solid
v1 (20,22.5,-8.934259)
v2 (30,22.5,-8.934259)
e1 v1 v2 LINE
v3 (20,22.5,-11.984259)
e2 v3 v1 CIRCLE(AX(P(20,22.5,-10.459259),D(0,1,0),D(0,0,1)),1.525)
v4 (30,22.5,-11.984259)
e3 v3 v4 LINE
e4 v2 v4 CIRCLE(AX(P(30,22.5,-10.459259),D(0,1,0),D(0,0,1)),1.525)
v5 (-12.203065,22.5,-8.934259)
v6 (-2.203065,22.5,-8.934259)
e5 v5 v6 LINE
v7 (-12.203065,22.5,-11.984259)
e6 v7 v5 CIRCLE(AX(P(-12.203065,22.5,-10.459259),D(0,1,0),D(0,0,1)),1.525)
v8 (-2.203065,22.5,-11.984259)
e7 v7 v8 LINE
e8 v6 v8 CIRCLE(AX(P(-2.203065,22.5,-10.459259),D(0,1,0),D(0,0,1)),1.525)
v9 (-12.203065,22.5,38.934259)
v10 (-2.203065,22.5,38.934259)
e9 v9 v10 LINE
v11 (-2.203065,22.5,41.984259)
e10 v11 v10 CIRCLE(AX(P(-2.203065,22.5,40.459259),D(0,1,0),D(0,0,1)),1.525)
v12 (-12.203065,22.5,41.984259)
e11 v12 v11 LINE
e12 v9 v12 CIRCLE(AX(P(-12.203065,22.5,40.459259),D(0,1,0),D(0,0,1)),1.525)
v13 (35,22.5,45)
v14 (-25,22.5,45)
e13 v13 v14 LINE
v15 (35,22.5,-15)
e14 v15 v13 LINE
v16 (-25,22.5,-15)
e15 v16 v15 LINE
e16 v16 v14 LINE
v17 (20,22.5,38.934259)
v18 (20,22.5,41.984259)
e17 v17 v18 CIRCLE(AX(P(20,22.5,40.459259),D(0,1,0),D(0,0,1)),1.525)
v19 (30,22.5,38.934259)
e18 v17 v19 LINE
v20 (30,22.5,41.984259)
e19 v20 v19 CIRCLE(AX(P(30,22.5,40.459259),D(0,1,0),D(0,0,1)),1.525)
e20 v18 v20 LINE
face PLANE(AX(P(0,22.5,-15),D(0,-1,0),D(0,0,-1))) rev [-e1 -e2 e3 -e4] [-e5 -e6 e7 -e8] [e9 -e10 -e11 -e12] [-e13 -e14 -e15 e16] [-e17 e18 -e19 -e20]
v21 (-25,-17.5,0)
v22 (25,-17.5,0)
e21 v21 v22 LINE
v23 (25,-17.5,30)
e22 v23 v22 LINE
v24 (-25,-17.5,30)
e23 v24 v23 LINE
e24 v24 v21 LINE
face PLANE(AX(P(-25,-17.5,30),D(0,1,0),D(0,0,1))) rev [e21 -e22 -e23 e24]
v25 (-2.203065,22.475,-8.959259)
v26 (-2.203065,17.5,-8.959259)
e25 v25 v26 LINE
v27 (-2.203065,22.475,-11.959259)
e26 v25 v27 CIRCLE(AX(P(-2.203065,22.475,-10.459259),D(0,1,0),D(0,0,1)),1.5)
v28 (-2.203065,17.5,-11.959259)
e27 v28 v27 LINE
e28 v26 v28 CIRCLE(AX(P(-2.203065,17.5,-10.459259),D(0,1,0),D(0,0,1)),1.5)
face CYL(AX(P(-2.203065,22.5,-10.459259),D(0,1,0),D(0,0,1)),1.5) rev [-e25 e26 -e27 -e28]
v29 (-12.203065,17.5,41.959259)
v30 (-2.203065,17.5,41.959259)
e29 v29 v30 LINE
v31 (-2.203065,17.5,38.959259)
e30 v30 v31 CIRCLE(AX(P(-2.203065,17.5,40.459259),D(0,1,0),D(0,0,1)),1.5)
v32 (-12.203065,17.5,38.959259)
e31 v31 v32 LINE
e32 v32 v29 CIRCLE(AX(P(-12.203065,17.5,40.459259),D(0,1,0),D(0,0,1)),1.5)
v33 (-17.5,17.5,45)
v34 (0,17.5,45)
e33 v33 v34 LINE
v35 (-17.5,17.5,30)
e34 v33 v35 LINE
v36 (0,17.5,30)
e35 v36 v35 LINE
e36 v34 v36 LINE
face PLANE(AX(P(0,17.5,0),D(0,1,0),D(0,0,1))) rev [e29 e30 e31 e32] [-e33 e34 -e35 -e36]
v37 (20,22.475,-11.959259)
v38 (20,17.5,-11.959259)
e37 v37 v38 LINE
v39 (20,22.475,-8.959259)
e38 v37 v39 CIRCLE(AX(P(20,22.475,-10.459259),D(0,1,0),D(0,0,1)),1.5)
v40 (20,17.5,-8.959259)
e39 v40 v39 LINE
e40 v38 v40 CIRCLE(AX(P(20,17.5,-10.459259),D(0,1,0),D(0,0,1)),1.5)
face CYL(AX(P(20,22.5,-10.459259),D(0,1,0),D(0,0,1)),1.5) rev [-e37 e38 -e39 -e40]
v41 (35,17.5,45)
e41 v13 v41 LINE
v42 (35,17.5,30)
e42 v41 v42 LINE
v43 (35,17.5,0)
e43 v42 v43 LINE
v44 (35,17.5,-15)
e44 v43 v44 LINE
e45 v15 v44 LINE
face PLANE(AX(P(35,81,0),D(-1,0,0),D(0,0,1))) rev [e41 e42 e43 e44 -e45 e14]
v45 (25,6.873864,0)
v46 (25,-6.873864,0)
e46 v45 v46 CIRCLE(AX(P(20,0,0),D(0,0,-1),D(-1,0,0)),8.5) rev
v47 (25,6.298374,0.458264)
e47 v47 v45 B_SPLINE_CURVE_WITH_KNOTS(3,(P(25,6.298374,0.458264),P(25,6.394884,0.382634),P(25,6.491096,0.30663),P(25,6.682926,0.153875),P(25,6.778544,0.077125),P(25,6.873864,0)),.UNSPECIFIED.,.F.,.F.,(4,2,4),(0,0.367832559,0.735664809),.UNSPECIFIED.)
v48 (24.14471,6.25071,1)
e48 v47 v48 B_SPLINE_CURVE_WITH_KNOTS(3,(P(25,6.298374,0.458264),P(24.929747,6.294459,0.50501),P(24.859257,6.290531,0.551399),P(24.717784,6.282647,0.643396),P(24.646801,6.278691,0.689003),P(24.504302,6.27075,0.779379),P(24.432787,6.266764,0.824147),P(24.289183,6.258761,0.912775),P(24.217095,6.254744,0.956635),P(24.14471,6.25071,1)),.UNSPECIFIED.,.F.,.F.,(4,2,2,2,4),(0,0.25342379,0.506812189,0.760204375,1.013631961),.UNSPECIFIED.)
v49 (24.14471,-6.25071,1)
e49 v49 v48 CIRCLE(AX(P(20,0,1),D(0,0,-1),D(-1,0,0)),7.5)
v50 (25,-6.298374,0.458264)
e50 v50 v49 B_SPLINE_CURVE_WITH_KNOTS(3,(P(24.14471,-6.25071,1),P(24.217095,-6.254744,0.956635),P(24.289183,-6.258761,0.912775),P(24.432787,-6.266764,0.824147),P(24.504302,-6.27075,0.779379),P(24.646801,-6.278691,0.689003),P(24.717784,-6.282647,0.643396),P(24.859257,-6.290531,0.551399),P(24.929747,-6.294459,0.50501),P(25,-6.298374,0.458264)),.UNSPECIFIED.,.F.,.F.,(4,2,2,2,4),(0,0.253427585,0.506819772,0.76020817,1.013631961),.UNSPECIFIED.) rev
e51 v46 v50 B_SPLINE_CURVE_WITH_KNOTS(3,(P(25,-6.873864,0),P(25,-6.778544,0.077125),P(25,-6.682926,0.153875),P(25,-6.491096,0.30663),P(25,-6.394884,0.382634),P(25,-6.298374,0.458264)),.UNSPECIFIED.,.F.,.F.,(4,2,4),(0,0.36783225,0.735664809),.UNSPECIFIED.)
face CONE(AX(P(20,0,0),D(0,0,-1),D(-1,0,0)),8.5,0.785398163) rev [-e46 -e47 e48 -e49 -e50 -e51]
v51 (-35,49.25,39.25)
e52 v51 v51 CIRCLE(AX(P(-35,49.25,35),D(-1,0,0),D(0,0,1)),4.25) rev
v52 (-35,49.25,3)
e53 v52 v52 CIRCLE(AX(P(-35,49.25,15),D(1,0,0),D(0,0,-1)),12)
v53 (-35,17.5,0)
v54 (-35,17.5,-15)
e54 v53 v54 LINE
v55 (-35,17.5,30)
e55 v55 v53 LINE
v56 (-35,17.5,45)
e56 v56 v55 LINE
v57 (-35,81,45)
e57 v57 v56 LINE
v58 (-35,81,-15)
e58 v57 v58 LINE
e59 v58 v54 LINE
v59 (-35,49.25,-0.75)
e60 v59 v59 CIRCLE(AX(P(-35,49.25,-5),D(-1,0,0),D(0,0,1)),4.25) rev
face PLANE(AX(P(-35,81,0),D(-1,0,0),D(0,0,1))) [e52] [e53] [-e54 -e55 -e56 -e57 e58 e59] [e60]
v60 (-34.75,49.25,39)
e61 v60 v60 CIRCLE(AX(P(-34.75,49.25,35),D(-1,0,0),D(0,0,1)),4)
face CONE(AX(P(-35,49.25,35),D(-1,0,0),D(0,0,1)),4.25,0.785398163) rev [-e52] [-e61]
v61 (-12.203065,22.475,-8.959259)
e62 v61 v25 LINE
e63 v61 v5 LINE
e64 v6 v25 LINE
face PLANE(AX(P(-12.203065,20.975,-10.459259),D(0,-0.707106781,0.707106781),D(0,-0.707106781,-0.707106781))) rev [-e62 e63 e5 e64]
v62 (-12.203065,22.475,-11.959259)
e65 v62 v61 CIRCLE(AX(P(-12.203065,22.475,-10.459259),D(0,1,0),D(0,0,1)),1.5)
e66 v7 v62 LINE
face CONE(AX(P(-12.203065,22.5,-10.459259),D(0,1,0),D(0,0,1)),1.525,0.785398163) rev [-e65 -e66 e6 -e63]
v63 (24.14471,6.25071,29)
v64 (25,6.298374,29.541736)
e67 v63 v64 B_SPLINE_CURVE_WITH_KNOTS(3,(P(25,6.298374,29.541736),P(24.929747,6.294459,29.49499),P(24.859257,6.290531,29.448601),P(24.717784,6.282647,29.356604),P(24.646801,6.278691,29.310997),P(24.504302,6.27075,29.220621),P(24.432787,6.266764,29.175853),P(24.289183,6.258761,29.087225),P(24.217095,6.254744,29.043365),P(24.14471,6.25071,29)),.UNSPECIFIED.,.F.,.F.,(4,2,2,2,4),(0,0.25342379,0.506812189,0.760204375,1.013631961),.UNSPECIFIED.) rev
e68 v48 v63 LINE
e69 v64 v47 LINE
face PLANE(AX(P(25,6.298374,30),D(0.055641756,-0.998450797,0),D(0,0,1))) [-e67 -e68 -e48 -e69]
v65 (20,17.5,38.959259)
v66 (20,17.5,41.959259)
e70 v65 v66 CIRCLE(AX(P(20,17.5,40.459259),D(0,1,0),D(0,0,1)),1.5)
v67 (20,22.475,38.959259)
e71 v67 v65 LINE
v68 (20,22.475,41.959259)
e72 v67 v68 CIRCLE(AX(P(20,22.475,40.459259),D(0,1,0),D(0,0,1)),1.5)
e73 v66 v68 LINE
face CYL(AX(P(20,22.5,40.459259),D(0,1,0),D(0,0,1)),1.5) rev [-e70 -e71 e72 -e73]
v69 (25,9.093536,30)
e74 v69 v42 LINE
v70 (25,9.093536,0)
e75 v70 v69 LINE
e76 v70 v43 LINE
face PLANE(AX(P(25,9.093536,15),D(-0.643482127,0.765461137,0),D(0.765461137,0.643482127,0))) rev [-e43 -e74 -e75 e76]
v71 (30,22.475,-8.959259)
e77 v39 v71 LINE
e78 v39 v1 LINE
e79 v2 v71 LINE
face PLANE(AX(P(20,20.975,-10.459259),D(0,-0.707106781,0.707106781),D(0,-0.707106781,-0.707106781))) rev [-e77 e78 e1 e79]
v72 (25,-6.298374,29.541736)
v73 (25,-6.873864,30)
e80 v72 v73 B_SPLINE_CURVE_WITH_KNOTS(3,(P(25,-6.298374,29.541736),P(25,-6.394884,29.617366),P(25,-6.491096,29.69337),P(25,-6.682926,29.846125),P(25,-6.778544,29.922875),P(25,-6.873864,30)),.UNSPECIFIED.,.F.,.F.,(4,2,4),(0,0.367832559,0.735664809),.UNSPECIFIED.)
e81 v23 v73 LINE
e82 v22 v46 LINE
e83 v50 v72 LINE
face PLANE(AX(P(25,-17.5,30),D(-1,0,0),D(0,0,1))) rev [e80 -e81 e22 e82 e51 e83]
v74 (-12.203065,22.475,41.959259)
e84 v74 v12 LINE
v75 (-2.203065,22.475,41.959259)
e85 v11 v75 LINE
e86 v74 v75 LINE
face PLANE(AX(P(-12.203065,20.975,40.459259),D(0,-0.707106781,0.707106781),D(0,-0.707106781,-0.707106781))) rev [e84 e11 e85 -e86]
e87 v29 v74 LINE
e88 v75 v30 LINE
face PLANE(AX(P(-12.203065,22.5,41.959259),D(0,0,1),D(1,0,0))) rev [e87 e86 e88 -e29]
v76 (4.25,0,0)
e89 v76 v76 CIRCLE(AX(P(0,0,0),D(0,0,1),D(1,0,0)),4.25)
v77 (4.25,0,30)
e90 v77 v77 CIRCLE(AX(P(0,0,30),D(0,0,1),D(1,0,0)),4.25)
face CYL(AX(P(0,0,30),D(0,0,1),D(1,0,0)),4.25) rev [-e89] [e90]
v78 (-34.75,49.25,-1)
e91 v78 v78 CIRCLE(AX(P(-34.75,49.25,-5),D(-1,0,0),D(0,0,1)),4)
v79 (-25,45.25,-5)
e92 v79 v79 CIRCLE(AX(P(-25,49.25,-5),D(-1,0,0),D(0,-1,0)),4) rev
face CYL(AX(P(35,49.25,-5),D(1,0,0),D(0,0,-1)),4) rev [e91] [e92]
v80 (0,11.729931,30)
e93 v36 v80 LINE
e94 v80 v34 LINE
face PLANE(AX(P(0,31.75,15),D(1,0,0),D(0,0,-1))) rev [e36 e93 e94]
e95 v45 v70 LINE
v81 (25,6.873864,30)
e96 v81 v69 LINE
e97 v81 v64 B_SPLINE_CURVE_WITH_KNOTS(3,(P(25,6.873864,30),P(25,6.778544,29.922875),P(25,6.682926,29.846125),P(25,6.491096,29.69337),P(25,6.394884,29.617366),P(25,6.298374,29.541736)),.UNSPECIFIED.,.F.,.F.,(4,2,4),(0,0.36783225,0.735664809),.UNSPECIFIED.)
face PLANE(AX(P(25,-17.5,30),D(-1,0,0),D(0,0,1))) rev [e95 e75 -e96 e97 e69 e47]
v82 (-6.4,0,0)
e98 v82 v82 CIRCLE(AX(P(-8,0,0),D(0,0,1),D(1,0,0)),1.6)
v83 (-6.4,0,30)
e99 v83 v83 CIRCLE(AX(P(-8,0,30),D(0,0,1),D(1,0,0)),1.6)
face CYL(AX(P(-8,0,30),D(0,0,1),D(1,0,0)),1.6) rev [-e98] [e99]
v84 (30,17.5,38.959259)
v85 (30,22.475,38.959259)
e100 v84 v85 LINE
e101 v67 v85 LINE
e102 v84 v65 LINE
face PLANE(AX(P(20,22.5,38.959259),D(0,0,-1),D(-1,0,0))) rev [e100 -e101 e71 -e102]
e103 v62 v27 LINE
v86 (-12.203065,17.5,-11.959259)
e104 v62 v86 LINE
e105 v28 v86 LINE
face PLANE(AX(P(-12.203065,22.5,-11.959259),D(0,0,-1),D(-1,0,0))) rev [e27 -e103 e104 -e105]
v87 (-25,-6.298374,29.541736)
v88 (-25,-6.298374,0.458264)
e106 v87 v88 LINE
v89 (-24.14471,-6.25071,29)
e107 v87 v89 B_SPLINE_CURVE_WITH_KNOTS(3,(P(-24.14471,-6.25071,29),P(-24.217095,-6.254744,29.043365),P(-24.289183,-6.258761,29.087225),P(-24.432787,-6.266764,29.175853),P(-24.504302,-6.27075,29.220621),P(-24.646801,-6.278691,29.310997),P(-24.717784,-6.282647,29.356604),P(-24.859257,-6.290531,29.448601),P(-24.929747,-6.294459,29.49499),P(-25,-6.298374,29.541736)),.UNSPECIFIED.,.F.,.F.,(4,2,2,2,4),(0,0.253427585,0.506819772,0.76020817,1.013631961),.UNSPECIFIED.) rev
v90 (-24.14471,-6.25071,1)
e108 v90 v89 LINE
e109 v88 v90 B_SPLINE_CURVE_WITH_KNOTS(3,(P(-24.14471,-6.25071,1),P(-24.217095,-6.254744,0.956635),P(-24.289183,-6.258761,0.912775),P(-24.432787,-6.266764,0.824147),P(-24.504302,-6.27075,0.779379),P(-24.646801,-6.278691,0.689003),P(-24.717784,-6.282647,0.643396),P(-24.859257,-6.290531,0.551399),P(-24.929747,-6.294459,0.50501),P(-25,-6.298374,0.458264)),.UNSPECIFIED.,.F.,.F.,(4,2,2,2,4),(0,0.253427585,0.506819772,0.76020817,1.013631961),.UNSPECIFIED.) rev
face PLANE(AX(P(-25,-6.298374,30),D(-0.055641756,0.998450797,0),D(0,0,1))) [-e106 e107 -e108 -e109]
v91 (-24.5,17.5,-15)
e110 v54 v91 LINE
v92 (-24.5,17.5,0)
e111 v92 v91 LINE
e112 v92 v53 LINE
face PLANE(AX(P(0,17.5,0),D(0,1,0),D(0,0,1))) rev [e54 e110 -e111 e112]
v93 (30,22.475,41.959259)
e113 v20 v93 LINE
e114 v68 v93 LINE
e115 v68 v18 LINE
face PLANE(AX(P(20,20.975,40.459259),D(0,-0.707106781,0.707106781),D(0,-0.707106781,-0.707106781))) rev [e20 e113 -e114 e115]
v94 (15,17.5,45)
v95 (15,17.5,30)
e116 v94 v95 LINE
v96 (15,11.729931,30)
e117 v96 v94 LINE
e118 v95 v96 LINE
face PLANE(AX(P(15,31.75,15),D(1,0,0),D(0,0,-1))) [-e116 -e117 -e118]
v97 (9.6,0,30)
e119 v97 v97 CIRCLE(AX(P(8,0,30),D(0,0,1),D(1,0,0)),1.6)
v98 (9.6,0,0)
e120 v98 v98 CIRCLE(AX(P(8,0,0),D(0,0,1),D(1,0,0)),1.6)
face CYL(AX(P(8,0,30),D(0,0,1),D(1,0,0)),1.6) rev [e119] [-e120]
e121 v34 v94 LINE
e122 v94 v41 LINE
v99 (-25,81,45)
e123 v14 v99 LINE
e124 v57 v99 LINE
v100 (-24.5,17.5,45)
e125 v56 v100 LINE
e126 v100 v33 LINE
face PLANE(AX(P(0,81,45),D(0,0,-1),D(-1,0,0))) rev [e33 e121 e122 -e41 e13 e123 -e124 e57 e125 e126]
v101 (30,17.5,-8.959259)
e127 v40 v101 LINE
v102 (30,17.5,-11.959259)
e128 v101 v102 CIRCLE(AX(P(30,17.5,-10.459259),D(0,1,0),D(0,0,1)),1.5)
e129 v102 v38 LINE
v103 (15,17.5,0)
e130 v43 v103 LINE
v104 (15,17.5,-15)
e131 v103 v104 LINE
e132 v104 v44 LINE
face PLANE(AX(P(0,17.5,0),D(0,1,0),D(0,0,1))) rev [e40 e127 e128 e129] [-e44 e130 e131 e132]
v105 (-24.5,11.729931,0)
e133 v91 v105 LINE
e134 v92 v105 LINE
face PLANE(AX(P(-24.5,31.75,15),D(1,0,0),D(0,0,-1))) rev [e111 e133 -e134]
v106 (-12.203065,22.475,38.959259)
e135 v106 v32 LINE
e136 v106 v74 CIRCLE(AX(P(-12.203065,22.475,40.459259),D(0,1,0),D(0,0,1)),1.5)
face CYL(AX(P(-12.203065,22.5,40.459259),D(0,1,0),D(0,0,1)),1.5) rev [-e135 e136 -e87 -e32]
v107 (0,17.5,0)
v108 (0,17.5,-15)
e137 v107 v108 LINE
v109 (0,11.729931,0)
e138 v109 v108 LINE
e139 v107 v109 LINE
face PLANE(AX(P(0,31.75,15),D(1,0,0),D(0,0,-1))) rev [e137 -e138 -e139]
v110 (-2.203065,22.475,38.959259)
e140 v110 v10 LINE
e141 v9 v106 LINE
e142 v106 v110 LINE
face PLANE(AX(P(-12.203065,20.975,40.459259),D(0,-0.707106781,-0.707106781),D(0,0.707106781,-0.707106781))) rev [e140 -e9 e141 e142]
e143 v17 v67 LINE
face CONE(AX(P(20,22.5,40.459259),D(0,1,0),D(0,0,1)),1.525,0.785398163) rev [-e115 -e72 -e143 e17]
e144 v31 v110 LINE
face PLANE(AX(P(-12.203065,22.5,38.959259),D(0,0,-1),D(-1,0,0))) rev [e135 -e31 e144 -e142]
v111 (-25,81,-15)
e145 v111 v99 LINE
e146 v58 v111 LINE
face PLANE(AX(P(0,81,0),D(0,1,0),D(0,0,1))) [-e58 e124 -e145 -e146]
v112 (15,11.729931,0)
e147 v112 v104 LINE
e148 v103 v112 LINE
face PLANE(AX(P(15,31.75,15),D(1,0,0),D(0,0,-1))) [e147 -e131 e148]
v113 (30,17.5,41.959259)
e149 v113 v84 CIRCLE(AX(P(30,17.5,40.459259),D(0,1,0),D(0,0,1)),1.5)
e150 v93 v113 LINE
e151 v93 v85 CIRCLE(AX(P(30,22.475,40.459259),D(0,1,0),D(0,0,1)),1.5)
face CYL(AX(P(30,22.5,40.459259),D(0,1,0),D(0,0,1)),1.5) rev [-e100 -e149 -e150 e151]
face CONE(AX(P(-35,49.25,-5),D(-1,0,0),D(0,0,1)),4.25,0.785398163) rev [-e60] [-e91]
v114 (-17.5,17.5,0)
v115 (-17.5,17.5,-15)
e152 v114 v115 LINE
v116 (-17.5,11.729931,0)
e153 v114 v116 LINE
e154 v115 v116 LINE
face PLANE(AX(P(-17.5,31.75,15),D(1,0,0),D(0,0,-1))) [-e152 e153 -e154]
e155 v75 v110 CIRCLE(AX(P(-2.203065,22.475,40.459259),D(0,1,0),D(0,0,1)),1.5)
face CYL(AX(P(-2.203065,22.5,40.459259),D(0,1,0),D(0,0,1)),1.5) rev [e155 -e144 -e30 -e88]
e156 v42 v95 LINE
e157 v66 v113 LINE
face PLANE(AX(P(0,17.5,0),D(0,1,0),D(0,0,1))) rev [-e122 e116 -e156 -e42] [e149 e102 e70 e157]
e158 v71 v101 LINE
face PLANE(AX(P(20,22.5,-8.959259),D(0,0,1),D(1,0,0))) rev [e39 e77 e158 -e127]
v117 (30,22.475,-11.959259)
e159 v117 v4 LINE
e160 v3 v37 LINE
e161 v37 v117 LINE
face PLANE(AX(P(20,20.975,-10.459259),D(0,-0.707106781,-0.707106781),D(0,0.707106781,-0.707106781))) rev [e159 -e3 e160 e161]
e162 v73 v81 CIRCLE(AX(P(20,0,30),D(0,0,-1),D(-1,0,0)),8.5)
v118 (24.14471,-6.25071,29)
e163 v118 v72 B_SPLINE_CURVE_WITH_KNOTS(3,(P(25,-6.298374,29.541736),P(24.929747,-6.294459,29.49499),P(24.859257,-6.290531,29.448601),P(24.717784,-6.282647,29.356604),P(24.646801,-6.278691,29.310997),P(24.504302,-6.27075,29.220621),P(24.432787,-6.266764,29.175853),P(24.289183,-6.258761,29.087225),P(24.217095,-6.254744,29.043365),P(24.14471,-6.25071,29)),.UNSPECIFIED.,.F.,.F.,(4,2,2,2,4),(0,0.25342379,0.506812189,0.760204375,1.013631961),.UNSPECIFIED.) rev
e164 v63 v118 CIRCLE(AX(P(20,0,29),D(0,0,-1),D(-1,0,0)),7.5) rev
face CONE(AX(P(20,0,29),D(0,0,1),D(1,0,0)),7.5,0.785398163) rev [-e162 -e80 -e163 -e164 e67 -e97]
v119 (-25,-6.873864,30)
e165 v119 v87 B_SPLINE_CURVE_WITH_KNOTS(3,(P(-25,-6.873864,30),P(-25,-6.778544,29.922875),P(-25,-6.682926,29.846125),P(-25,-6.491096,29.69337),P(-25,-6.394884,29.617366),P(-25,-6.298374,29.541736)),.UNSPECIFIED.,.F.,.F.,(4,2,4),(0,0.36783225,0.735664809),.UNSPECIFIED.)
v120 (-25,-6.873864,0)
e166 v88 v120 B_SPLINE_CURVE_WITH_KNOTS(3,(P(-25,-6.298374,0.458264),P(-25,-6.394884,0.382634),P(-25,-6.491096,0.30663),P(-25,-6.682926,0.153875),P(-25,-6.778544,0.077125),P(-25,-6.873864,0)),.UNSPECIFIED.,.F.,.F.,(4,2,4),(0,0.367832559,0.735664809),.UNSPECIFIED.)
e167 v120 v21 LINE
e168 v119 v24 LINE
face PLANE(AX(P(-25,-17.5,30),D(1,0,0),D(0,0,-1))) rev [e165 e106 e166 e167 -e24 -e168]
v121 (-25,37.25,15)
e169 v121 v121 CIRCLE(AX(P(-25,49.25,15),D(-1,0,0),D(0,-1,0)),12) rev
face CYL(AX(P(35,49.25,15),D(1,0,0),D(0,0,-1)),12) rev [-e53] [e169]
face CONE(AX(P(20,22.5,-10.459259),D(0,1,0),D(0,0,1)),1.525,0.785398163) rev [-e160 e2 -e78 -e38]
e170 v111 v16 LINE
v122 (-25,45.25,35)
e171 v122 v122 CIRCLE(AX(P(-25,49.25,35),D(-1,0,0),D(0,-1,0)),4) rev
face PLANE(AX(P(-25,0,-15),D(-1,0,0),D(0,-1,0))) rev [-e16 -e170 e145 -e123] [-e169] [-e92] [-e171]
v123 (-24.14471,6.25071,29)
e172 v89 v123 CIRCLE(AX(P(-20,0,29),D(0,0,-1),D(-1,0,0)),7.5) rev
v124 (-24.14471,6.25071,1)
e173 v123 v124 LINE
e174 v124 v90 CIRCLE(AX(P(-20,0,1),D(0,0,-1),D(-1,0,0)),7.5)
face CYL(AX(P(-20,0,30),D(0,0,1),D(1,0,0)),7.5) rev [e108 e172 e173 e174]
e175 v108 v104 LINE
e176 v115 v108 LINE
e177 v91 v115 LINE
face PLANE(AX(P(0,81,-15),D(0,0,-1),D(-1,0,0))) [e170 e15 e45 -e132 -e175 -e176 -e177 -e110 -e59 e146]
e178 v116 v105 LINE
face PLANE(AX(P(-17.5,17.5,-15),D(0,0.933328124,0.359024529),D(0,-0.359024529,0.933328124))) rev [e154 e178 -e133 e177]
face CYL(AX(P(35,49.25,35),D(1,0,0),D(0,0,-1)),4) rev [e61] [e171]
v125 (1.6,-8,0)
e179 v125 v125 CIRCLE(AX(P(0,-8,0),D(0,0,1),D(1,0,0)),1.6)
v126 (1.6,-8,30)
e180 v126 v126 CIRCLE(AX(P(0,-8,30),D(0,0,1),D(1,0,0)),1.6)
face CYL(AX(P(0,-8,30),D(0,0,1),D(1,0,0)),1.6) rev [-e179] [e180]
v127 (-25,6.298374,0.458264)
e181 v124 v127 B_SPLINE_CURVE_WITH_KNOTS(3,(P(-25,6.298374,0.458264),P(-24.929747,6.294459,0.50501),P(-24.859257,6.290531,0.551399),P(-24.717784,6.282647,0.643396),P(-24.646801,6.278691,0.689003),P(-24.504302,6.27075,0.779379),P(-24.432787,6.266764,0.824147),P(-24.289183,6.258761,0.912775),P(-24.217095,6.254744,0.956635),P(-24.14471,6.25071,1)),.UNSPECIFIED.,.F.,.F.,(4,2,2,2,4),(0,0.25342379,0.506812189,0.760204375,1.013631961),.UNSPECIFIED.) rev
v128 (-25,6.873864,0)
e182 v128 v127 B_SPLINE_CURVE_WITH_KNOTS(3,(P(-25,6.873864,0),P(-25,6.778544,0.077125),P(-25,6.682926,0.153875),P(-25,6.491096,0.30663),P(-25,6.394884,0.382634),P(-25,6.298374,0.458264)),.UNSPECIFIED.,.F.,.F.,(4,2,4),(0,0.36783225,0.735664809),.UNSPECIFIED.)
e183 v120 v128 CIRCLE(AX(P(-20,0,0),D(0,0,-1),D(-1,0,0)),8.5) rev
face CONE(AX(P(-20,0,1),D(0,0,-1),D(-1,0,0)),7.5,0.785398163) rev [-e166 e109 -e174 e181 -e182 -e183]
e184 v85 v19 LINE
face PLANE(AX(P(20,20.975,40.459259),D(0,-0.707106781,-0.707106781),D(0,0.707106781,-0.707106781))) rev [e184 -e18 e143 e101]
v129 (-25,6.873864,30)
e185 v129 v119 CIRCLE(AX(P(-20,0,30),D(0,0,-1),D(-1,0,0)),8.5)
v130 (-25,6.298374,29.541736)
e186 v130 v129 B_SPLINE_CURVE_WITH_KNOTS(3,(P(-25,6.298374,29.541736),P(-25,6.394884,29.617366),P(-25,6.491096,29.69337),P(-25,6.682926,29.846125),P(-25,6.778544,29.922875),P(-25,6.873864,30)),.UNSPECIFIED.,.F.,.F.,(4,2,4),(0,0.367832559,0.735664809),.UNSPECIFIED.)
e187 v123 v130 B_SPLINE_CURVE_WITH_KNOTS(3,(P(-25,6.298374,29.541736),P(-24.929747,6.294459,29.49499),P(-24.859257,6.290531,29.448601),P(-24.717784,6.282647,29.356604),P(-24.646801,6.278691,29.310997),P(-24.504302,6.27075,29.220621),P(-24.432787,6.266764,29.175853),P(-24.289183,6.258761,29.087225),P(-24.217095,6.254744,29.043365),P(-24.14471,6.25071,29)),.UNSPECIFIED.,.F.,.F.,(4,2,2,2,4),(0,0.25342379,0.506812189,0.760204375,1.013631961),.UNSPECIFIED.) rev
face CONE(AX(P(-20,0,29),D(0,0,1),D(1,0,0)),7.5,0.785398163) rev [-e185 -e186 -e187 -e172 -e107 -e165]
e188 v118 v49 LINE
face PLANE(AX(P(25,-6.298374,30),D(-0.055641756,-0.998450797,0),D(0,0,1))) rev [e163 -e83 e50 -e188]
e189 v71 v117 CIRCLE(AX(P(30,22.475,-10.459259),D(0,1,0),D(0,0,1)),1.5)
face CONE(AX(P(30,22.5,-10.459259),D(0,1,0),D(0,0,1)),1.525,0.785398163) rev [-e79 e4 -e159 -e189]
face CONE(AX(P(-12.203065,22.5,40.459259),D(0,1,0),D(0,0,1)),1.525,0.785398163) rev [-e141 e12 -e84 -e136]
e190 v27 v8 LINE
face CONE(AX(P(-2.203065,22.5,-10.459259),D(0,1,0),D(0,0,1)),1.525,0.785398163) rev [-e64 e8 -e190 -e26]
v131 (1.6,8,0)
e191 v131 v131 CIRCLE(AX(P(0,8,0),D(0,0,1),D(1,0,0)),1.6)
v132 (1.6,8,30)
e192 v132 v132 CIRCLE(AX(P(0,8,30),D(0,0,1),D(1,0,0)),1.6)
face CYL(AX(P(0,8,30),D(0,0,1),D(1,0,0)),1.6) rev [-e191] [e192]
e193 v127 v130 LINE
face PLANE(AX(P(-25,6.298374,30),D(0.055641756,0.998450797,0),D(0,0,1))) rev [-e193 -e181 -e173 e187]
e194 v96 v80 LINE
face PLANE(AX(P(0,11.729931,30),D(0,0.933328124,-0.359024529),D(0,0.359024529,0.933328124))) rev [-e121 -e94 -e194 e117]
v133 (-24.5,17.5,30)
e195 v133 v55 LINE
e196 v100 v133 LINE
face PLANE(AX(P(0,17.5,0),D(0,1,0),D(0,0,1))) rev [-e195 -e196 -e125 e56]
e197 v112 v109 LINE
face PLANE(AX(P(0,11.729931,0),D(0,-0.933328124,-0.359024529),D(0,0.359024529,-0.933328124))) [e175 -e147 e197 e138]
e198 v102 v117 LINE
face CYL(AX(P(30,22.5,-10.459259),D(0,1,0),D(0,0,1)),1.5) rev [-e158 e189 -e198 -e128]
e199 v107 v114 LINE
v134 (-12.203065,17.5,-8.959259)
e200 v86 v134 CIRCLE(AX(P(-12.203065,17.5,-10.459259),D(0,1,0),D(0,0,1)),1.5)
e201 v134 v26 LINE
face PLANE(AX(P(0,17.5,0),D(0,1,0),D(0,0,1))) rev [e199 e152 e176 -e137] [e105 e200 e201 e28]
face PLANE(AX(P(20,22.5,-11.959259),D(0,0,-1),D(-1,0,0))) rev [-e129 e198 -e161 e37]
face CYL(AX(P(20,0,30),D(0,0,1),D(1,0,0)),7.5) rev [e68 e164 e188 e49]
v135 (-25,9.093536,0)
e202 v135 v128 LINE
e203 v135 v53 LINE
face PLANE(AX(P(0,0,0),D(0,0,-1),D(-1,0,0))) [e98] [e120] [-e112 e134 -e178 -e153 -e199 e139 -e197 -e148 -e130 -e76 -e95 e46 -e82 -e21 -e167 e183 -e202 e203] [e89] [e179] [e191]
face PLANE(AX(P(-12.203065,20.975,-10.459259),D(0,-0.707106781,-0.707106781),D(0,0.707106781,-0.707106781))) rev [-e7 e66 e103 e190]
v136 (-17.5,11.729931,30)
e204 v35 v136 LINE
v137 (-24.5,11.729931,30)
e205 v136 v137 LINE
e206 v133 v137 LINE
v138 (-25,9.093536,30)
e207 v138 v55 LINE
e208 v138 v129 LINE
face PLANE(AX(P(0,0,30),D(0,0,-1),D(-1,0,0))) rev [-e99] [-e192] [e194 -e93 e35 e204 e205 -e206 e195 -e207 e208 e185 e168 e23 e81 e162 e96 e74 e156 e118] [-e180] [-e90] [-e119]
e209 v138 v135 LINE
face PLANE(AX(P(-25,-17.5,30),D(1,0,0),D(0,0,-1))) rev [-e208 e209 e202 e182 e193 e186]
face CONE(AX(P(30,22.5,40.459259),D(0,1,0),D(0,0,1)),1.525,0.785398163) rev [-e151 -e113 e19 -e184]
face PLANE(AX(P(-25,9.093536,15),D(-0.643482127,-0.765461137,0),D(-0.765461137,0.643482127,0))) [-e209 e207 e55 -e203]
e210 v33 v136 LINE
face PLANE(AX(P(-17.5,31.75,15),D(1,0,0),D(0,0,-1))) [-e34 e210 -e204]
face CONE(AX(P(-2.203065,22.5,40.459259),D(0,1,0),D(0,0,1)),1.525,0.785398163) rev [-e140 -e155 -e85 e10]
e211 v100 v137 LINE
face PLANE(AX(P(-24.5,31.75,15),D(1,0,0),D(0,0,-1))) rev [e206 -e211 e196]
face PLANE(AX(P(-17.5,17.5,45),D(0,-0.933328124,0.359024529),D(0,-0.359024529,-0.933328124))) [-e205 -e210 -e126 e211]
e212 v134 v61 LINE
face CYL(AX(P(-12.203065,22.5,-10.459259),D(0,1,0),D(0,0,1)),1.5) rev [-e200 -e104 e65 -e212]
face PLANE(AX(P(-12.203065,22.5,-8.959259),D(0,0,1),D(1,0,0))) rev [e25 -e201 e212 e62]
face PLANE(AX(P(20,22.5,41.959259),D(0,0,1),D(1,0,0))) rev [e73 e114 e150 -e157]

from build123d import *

# Parameters (mm, degrees)
SKETCH_1_W               = 50
SKETCH_1_H               = 35
EXTRUDE_1_DEPTH          = 30
HOLE_WIZARD_362_D        = 8.5
HOLE_WIZARD_467_D        = 3.2
HOLE_WIZARD_621_D        = 15
CHAMFER_1_SIZE           = 1
CHAMFER_1_SIZE_2         = 0.708203932
SKETCH_8_W               = 70
SKETCH_8_H               = 60
SKETCH_8_W_2             = 50
SKETCH_8_H_2             = 30
EXTRUDE_2_DEPTH          = 63.5
HOLE_WIZARD_1_D          = 24
HOLE_WIZARD_2_D          = 8
CHAMFER_2_SIZE           = 0.25
CUT_EXTRUDE_2_DEPTH      = 107.705201373
CUT_EXTRUDE_2_DEPTH_BACK = 107.705201373
SKETCH_14_W              = 60
SKETCH_14_H              = 58.5
MM_START                 = 17
MM_2_DEPTH               = 5.5
RIB_1_REACH              = 95.199
SKETCH_25_WALL_W         = 201.46144539
SKETCH_25_WALL_H         = 30
RIB_2_REACH              = 101.05
SKETCH_26_WALL_W         = 216.17250262
SKETCH_26_WALL_H         = 15
RIB_4_REACH              = 108.5
SKETCH_27_WALL_W         = 231.071518272
SKETCH_27_WALL_H         = 7


with BuildPart() as part:
    # 草图1 → 凸台-拉伸1 (new body)
    with BuildSketch(Plane.XY):
        Rectangle(SKETCH_1_W, SKETCH_1_H)
    extrude(amount=EXTRUDE_1_DEPTH)

    # Hole Wizard 362 (through all)
    with Locations(Plane.XY.offset(30)):
        with Locations((0, 0)):
            Hole(HOLE_WIZARD_362_D / 2)

    # Hole Wizard 467 (through all)
    with Locations(Plane.XY.offset(30)):
        with Locations((8, 0), (0, 8), (-8, 0), (0, -8)):
            Hole(HOLE_WIZARD_467_D / 2)

    # Hole Wizard 621 (through all)
    with Locations(Plane.XY.offset(30)):
        with Locations((20, 0), (-20, 0)):
            Hole(HOLE_WIZARD_621_D / 2)

    # 倒角1
    # the kernel refuses this chamfer: 1, 0.708203932 mm, written as the material it takes off along each edge
    with BuildSketch(Plane(origin=(-20, 0, 0), x_dir=(-0.8790200859122482, 0.4767847402789059, 0), z_dir=(-0.4767847402789059, -0.8790200859122482, 0))) as chamfer_1_piece_1:
        Polygon((7.5, -CHAMFER_1_SIZE), (7.5 + CHAMFER_1_SIZE, 0), (7.5, 0), align=None)
    revolve(axis=Axis((-20, 0, 0), (0, 0, -1)), revolution_arc=303.048763938, mode=Mode.SUBTRACT)
    with BuildSketch(Plane(origin=(-20, 0, 30), x_dir=(-0.879020085912248, 0.47678474027890627, 0), z_dir=(-0.47678474027890627, -0.879020085912248, 0))) as chamfer_1_piece_2:
        Polygon((7.5 + CHAMFER_1_SIZE, 0), (7.5, CHAMFER_1_SIZE), (7.5, 0), align=None)
    revolve(axis=Axis((-20, 0, 30), (0, 0, -1)), revolution_arc=303.048763938, mode=Mode.SUBTRACT)
    with BuildSketch(Plane(origin=(20, 0, 30), x_dir=(0.879020085912248, -0.4767847402789061, 0), z_dir=(0.4767847402789061, 0.879020085912248, 0))) as chamfer_1_piece_3:
        Polygon((7.5 + CHAMFER_1_SIZE, 0), (7.5, CHAMFER_1_SIZE), (7.5, 0), align=None)
    revolve(axis=Axis((20, 0, 30), (0, 0, -1)), revolution_arc=303.048763938, mode=Mode.SUBTRACT)
    with BuildSketch(Plane(origin=(20, 0, 0), x_dir=(0.8790200859122481, 0.476784740278906, 0), z_dir=(0.476784740278906, -0.8790200859122481, 0))) as chamfer_1_piece_4:
        Polygon((7.5, CHAMFER_1_SIZE), (7.5 + CHAMFER_1_SIZE, 0), (7.5, 0), align=None)
    revolve(axis=Axis((20, 0, 0), (0, 0, 1)), revolution_arc=303.048763938, mode=Mode.SUBTRACT)
    with BuildSketch(Plane(origin=(-25, 5.590169944, 32.778051389), x_dir=(0.7914486393779661, 0.611235675682274, 0), z_dir=(0, 0, -1)), Plane(origin=(25, -5.590169944, 32.778051389), x_dir=(-0.7914486393779661, -0.611235675682274, 0), z_dir=(0, 0, -1))) as chamfer_1_piece_5:
        with BuildLine():
            Line((1.080663788, 0), (CHAMFER_1_SIZE_2 * 0.611235676113, -CHAMFER_1_SIZE_2 * 0.791448639936))
            Line((CHAMFER_1_SIZE_2 * 0.611235676113, -CHAMFER_1_SIZE_2 * 0.791448639936), (0, 0))
            ThreePointArc((0, 0), (0.555522087, -0.019473843), (1.080663788, 0))
        make_face()
    extrude(amount=35.556102778, mode=Mode.SUBTRACT)
    with BuildSketch(Plane(origin=(-25, -5.590169944, 32.778051389), x_dir=(0.7914486393779665, -0.6112356756822735, 0), z_dir=(0, 0, -1))) as chamfer_1_piece_6:
        with BuildLine():
            Line((1.080663788, 0), (CHAMFER_1_SIZE_2 * 0.611235676113, CHAMFER_1_SIZE_2 * 0.791448639936))
            Line((CHAMFER_1_SIZE_2 * 0.611235676113, CHAMFER_1_SIZE_2 * 0.791448639936), (0, 0))
            ThreePointArc((0, 0), (0.555522087, 0.019473843), (1.080663788, 0))
        make_face()
    extrude(amount=35.556102778, mode=Mode.SUBTRACT)
    with BuildSketch(Plane(origin=(25, 5.590169944, 32.778051389), x_dir=(0, 1, 0), z_dir=(0, 0, -1))) as chamfer_1_piece_7:
        with BuildLine():
            Line((CHAMFER_1_SIZE_2, 0), (0.660540261, -0.855289885))
            ThreePointArc((0.660540261, -0.855289885), (0.354967464, -0.427764092), (0, 0))
            Line((0, 0), (CHAMFER_1_SIZE_2, 0))
        make_face()
    extrude(amount=35.556102778, mode=Mode.SUBTRACT)

    # 草图8 → 凸台-拉伸2 (add)
    # profile 1 of 5: a face of its own
    with BuildSketch(Plane(origin=(0, 17.5, 0), x_dir=(1, 0, 0), z_dir=(0, 1, 0))):
        with Locations((0, -15)):
            Rectangle(SKETCH_8_W, SKETCH_8_H)
        with Locations((0, -15)):
            Rectangle(SKETCH_8_W_2, SKETCH_8_H_2, mode=Mode.SUBTRACT)
    # profile 2 of 5: a face of its own
    with BuildSketch(Plane(origin=(0, 17.5, 0), x_dir=(1, 0, 0), z_dir=(0, 1, 0))):
        Polygon((25, 0), (0, -15), (25, -30), align=None)
    # profile 3 of 5: a face of its own
    with BuildSketch(Plane(origin=(0, 17.5, 0), x_dir=(1, 0, 0), z_dir=(0, 1, 0))):
        Polygon((25, -30), (0, -15), (-25, -30), align=None)
    # profile 4 of 5: a face of its own
    with BuildSketch(Plane(origin=(0, 17.5, 0), x_dir=(1, 0, 0), z_dir=(0, 1, 0))):
        Polygon((0, -15), (-25, 0), (-25, -30), align=None)
    # profile 5 of 5: a face of its own
    with BuildSketch(Plane(origin=(0, 17.5, 0), x_dir=(1, 0, 0), z_dir=(0, 1, 0))):
        Polygon((25, 0), (-25, 0), (0, -15), align=None)
    extrude(amount=EXTRUDE_2_DEPTH)

    # 孔1 (through all)
    with Locations(Plane(origin=(35, 0, 0), x_dir=(0, 0, -1), z_dir=(1, 0, 0))):
        with Locations((-15, 49.25)):
            Hole(HOLE_WIZARD_1_D / 2)

    # 孔2 (through all)
    with Locations(Plane(origin=(35, 0, 0), x_dir=(0, 0, -1), z_dir=(1, 0, 0))):
        with Locations((5, 49.25), (-35, 49.25)):
            Hole(HOLE_WIZARD_2_D / 2)

    # 倒角2
    chamfer_2_edges = [part.edges().sort_by_distance(p)[0] for p in [
        (-35, 49.25, 31),
        (-35, 49.25, -9),
    ]]
    chamfer(chamfer_2_edges, length=CHAMFER_2_SIZE)

    # 草图14 → 切除-拉伸2 (cut, two sides: drawn at the far end of the back side and taken through both)
    with BuildSketch(Plane.XY.offset(45).offset(-CUT_EXTRUDE_2_DEPTH_BACK)):
        with Locations((5, 51.75)):
            Rectangle(SKETCH_14_W, SKETCH_14_H)
    extrude(amount=CUT_EXTRUDE_2_DEPTH + CUT_EXTRUDE_2_DEPTH_BACK, mode=Mode.SUBTRACT)

    # 大小mm 暗销槽口2: read off the stored shape, not the designer's step
    # 大小mm 暗销槽口2 outline → 大小mm 暗销槽口2 (cut)
    with BuildSketch(Plane(origin=(0, 0, 0), x_dir=(1, 0, 0), z_dir=(0, 1, 0)).offset(MM_START)):
        with BuildLine():
            Line((30, 11.959259259), (20, 11.959259259))
            ThreePointArc((20, 11.959259259), (18.5, 10.459259259), (20, 8.959259259))
            Line((20, 8.959259259), (30, 8.959259259))
            ThreePointArc((30, 8.959259259), (31.5, 10.459259259), (30, 11.959259259))
        make_face()
        with BuildLine():
            ThreePointArc((-12.203065134, 11.959259259), (-13.703065134, 10.459259259), (-12.203065134, 8.959259259))
            Line((-12.203065134, 8.959259259), (-2.203065134, 8.959259259))
            ThreePointArc((-2.203065134, 8.959259259), (-0.703065134, 10.459259259), (-2.203065134, 11.959259259))
            Line((-2.203065134, 11.959259259), (-12.203065134, 11.959259259))
        make_face()
    mm_2 = extrude(amount=MM_2_DEPTH, mode=Mode.SUBTRACT)

    # mm _2 2: loft between two sections, ruled curve by curve
    mm_2_2_from = [
        Edge.make_three_point_arc((30, 22.475, -8.959259259), (31.060660172, 22.475, -9.398599087), (31.5, 22.475, -10.459259259)),
        Edge.make_three_point_arc((31.5, 22.475, -10.459259259), (31.060660172, 22.475, -11.519919431), (30, 22.475, -11.959259259)),
        Edge.make_three_point_arc((20, 22.475, -11.959259259), (18.939339828, 22.475, -11.519919431), (18.5, 22.475, -10.459259259)),
        Edge.make_three_point_arc((18.5, 22.475, -10.459259259), (18.939339828, 22.475, -9.398599087), (20, 22.475, -8.959259259)),
        Edge.make_line((30, 22.475, -11.959259259), (20, 22.475, -11.959259259)),
        Edge.make_line((30, 22.475, -8.959259259), (20, 22.475, -8.959259259)),
    ]
    mm_2_2_to = [
        Edge.make_three_point_arc((30, 22.5, -8.934259259), (31.078337841, 22.5, -9.380921418), (31.525, 22.5, -10.459259259)),
        Edge.make_three_point_arc((31.525, 22.5, -10.459259259), (31.078337841, 22.5, -11.537597101), (30, 22.5, -11.984259259)),
        Edge.make_three_point_arc((20, 22.5, -11.984259259), (18.921662159, 22.5, -11.537597101), (18.475, 22.5, -10.459259259)),
        Edge.make_three_point_arc((18.475, 22.5, -10.459259259), (18.921662159, 22.5, -9.380921418), (20, 22.5, -8.934259259)),
        Edge.make_line((30, 22.5, -11.984259259), (20, 22.5, -11.984259259)),
        Edge.make_line((30, 22.5, -8.934259259), (20, 22.5, -8.934259259)),
    ]
    mm_2_2 = Solid(Shell([*[Face.make_surface_from_curves(mm_2_2_from[k], mm_2_2_to[k]) for k in range(6)], Face(Wire(mm_2_2_from)), Face(Wire(mm_2_2_to))]))
    add(mm_2_2, mode=Mode.SUBTRACT)

    # mm _2 3: loft between two sections, ruled curve by curve
    mm_2_3_from = [
        Edge.make_three_point_arc((-2.203065134, 22.475, -8.959259259), (-1.142404962, 22.475, -9.398599087), (-0.703065134, 22.475, -10.459259259)),
        Edge.make_three_point_arc((-0.703065134, 22.475, -10.459259259), (-1.142404962, 22.475, -11.519919431), (-2.203065134, 22.475, -11.959259259)),
        Edge.make_three_point_arc((-12.203065134, 22.475, -11.959259259), (-13.263725306, 22.475, -11.519919431), (-13.703065134, 22.475, -10.459259259)),
        Edge.make_three_point_arc((-13.703065134, 22.475, -10.459259259), (-13.263725306, 22.475, -9.398599087), (-12.203065134, 22.475, -8.959259259)),
        Edge.make_line((-2.203065134, 22.475, -11.959259259), (-12.203065134, 22.475, -11.959259259)),
        Edge.make_line((-2.203065134, 22.475, -8.959259259), (-12.203065134, 22.475, -8.959259259)),
    ]
    mm_2_3_to = [
        Edge.make_three_point_arc((-2.203065134, 22.5, -8.934259259), (-1.124727293, 22.5, -9.380921418), (-0.678065134, 22.5, -10.459259259)),
        Edge.make_three_point_arc((-0.678065134, 22.5, -10.459259259), (-1.124727293, 22.5, -11.537597101), (-2.203065134, 22.5, -11.984259259)),
        Edge.make_three_point_arc((-12.203065134, 22.5, -11.984259259), (-13.281402975, 22.5, -11.537597101), (-13.728065134, 22.5, -10.459259259)),
        Edge.make_three_point_arc((-13.728065134, 22.5, -10.459259259), (-13.281402975, 22.5, -9.380921418), (-12.203065134, 22.5, -8.934259259)),
        Edge.make_line((-2.203065134, 22.5, -11.984259259), (-12.203065134, 22.5, -11.984259259)),
        Edge.make_line((-2.203065134, 22.5, -8.934259259), (-12.203065134, 22.5, -8.934259259)),
    ]
    mm_2_3 = Solid(Shell([*[Face.make_surface_from_curves(mm_2_3_from[k], mm_2_3_to[k]) for k in range(6)], Face(Wire(mm_2_3_from)), Face(Wire(mm_2_3_to))]))
    add(mm_2_3, mode=Mode.SUBTRACT)

    # 镜向1: 大小mm 暗销槽口2, mm _2 2, mm _2 3 across plane
    add(mm_2.mirror(Plane(origin=(0, 0, 15), x_dir=(1, 0, 0), z_dir=(0, 0, -1))), mode=Mode.SUBTRACT)
    add(mm_2_2.mirror(Plane(origin=(0, 0, 15), x_dir=(1, 0, 0), z_dir=(0, 0, -1))), mode=Mode.SUBTRACT)
    add(mm_2_3.mirror(Plane(origin=(0, 0, 15), x_dir=(1, 0, 0), z_dir=(0, 0, -1))), mode=Mode.SUBTRACT)

    # 草图25 wall → 筋1 (add, up to next)
    with BuildSketch(Plane(origin=(-30, 13.296768148, 15), x_dir=(-0.765461137236, 0.6434821267, 0), z_dir=(0.6434821267, 0.765461137236, 0)), mode=Mode.PRIVATE) as rib_1_sk1:
        Rectangle(SKETCH_25_WALL_W, SKETCH_25_WALL_H)
    rib_1_tool1 = extrude(rib_1_sk1.sketch, amount=RIB_1_REACH, mode=Mode.PRIVATE) - part.part
    rib_1 = rib_1_tool1.solids().sort_by_distance((-30, 13.296768148, 15))[0]
    add(rib_1)

    # 镜向2: 筋1 across plane
    add(rib_1.mirror(Plane(origin=(0, 0, 0), x_dir=(0, 0, 1), z_dir=(1, 0, 0))))

    # 草图26 wall → 筋2 (add, up to next)
    with BuildSketch(Plane(origin=(0, 14.614965359, 37.5), x_dir=(0, 0.359024529342, 0.933328124151), z_dir=(0, -0.933328124151, 0.359024529342)), mode=Mode.PRIVATE) as rib_2_sk1:
        with Locations((0, -7.5)):
            Rectangle(SKETCH_26_WALL_W, SKETCH_26_WALL_H)
    rib_2_tool1 = extrude(rib_2_sk1.sketch, amount=-RIB_2_REACH, mode=Mode.PRIVATE) - part.part
    rib_2 = rib_2_tool1.solids().sort_by_distance((0, 14.614965359, 37.5))[0]
    add(rib_2)

    # 草图27 wall → 筋4 (add, up to next)
    with BuildSketch(Plane(origin=(-17.5, 14.614965359, 37.5), x_dir=(0, -0.359024529342, -0.933328124151), z_dir=(0, 0.933328124151, -0.359024529342)), mode=Mode.PRIVATE) as rib_4_sk1:
        with Locations((0, 3.5)):
            Rectangle(SKETCH_27_WALL_W, SKETCH_27_WALL_H)
    rib_4_tool1 = extrude(rib_4_sk1.sketch, amount=RIB_4_REACH, mode=Mode.PRIVATE) - part.part
    rib_4 = rib_4_tool1.solids().sort_by_distance((-17.5, 14.614965359, 37.5))[0]
    add(rib_4)

    # 镜向4: 筋2, 筋4 across plane
    add(rib_2.mirror(Plane(origin=(0, 0, 15), x_dir=(1, 0, 0), z_dir=(0, 0, -1))))
    add(rib_4.mirror(Plane(origin=(0, 0, 15), x_dir=(1, 0, 0), z_dir=(0, 0, -1))))


solid = part.part
